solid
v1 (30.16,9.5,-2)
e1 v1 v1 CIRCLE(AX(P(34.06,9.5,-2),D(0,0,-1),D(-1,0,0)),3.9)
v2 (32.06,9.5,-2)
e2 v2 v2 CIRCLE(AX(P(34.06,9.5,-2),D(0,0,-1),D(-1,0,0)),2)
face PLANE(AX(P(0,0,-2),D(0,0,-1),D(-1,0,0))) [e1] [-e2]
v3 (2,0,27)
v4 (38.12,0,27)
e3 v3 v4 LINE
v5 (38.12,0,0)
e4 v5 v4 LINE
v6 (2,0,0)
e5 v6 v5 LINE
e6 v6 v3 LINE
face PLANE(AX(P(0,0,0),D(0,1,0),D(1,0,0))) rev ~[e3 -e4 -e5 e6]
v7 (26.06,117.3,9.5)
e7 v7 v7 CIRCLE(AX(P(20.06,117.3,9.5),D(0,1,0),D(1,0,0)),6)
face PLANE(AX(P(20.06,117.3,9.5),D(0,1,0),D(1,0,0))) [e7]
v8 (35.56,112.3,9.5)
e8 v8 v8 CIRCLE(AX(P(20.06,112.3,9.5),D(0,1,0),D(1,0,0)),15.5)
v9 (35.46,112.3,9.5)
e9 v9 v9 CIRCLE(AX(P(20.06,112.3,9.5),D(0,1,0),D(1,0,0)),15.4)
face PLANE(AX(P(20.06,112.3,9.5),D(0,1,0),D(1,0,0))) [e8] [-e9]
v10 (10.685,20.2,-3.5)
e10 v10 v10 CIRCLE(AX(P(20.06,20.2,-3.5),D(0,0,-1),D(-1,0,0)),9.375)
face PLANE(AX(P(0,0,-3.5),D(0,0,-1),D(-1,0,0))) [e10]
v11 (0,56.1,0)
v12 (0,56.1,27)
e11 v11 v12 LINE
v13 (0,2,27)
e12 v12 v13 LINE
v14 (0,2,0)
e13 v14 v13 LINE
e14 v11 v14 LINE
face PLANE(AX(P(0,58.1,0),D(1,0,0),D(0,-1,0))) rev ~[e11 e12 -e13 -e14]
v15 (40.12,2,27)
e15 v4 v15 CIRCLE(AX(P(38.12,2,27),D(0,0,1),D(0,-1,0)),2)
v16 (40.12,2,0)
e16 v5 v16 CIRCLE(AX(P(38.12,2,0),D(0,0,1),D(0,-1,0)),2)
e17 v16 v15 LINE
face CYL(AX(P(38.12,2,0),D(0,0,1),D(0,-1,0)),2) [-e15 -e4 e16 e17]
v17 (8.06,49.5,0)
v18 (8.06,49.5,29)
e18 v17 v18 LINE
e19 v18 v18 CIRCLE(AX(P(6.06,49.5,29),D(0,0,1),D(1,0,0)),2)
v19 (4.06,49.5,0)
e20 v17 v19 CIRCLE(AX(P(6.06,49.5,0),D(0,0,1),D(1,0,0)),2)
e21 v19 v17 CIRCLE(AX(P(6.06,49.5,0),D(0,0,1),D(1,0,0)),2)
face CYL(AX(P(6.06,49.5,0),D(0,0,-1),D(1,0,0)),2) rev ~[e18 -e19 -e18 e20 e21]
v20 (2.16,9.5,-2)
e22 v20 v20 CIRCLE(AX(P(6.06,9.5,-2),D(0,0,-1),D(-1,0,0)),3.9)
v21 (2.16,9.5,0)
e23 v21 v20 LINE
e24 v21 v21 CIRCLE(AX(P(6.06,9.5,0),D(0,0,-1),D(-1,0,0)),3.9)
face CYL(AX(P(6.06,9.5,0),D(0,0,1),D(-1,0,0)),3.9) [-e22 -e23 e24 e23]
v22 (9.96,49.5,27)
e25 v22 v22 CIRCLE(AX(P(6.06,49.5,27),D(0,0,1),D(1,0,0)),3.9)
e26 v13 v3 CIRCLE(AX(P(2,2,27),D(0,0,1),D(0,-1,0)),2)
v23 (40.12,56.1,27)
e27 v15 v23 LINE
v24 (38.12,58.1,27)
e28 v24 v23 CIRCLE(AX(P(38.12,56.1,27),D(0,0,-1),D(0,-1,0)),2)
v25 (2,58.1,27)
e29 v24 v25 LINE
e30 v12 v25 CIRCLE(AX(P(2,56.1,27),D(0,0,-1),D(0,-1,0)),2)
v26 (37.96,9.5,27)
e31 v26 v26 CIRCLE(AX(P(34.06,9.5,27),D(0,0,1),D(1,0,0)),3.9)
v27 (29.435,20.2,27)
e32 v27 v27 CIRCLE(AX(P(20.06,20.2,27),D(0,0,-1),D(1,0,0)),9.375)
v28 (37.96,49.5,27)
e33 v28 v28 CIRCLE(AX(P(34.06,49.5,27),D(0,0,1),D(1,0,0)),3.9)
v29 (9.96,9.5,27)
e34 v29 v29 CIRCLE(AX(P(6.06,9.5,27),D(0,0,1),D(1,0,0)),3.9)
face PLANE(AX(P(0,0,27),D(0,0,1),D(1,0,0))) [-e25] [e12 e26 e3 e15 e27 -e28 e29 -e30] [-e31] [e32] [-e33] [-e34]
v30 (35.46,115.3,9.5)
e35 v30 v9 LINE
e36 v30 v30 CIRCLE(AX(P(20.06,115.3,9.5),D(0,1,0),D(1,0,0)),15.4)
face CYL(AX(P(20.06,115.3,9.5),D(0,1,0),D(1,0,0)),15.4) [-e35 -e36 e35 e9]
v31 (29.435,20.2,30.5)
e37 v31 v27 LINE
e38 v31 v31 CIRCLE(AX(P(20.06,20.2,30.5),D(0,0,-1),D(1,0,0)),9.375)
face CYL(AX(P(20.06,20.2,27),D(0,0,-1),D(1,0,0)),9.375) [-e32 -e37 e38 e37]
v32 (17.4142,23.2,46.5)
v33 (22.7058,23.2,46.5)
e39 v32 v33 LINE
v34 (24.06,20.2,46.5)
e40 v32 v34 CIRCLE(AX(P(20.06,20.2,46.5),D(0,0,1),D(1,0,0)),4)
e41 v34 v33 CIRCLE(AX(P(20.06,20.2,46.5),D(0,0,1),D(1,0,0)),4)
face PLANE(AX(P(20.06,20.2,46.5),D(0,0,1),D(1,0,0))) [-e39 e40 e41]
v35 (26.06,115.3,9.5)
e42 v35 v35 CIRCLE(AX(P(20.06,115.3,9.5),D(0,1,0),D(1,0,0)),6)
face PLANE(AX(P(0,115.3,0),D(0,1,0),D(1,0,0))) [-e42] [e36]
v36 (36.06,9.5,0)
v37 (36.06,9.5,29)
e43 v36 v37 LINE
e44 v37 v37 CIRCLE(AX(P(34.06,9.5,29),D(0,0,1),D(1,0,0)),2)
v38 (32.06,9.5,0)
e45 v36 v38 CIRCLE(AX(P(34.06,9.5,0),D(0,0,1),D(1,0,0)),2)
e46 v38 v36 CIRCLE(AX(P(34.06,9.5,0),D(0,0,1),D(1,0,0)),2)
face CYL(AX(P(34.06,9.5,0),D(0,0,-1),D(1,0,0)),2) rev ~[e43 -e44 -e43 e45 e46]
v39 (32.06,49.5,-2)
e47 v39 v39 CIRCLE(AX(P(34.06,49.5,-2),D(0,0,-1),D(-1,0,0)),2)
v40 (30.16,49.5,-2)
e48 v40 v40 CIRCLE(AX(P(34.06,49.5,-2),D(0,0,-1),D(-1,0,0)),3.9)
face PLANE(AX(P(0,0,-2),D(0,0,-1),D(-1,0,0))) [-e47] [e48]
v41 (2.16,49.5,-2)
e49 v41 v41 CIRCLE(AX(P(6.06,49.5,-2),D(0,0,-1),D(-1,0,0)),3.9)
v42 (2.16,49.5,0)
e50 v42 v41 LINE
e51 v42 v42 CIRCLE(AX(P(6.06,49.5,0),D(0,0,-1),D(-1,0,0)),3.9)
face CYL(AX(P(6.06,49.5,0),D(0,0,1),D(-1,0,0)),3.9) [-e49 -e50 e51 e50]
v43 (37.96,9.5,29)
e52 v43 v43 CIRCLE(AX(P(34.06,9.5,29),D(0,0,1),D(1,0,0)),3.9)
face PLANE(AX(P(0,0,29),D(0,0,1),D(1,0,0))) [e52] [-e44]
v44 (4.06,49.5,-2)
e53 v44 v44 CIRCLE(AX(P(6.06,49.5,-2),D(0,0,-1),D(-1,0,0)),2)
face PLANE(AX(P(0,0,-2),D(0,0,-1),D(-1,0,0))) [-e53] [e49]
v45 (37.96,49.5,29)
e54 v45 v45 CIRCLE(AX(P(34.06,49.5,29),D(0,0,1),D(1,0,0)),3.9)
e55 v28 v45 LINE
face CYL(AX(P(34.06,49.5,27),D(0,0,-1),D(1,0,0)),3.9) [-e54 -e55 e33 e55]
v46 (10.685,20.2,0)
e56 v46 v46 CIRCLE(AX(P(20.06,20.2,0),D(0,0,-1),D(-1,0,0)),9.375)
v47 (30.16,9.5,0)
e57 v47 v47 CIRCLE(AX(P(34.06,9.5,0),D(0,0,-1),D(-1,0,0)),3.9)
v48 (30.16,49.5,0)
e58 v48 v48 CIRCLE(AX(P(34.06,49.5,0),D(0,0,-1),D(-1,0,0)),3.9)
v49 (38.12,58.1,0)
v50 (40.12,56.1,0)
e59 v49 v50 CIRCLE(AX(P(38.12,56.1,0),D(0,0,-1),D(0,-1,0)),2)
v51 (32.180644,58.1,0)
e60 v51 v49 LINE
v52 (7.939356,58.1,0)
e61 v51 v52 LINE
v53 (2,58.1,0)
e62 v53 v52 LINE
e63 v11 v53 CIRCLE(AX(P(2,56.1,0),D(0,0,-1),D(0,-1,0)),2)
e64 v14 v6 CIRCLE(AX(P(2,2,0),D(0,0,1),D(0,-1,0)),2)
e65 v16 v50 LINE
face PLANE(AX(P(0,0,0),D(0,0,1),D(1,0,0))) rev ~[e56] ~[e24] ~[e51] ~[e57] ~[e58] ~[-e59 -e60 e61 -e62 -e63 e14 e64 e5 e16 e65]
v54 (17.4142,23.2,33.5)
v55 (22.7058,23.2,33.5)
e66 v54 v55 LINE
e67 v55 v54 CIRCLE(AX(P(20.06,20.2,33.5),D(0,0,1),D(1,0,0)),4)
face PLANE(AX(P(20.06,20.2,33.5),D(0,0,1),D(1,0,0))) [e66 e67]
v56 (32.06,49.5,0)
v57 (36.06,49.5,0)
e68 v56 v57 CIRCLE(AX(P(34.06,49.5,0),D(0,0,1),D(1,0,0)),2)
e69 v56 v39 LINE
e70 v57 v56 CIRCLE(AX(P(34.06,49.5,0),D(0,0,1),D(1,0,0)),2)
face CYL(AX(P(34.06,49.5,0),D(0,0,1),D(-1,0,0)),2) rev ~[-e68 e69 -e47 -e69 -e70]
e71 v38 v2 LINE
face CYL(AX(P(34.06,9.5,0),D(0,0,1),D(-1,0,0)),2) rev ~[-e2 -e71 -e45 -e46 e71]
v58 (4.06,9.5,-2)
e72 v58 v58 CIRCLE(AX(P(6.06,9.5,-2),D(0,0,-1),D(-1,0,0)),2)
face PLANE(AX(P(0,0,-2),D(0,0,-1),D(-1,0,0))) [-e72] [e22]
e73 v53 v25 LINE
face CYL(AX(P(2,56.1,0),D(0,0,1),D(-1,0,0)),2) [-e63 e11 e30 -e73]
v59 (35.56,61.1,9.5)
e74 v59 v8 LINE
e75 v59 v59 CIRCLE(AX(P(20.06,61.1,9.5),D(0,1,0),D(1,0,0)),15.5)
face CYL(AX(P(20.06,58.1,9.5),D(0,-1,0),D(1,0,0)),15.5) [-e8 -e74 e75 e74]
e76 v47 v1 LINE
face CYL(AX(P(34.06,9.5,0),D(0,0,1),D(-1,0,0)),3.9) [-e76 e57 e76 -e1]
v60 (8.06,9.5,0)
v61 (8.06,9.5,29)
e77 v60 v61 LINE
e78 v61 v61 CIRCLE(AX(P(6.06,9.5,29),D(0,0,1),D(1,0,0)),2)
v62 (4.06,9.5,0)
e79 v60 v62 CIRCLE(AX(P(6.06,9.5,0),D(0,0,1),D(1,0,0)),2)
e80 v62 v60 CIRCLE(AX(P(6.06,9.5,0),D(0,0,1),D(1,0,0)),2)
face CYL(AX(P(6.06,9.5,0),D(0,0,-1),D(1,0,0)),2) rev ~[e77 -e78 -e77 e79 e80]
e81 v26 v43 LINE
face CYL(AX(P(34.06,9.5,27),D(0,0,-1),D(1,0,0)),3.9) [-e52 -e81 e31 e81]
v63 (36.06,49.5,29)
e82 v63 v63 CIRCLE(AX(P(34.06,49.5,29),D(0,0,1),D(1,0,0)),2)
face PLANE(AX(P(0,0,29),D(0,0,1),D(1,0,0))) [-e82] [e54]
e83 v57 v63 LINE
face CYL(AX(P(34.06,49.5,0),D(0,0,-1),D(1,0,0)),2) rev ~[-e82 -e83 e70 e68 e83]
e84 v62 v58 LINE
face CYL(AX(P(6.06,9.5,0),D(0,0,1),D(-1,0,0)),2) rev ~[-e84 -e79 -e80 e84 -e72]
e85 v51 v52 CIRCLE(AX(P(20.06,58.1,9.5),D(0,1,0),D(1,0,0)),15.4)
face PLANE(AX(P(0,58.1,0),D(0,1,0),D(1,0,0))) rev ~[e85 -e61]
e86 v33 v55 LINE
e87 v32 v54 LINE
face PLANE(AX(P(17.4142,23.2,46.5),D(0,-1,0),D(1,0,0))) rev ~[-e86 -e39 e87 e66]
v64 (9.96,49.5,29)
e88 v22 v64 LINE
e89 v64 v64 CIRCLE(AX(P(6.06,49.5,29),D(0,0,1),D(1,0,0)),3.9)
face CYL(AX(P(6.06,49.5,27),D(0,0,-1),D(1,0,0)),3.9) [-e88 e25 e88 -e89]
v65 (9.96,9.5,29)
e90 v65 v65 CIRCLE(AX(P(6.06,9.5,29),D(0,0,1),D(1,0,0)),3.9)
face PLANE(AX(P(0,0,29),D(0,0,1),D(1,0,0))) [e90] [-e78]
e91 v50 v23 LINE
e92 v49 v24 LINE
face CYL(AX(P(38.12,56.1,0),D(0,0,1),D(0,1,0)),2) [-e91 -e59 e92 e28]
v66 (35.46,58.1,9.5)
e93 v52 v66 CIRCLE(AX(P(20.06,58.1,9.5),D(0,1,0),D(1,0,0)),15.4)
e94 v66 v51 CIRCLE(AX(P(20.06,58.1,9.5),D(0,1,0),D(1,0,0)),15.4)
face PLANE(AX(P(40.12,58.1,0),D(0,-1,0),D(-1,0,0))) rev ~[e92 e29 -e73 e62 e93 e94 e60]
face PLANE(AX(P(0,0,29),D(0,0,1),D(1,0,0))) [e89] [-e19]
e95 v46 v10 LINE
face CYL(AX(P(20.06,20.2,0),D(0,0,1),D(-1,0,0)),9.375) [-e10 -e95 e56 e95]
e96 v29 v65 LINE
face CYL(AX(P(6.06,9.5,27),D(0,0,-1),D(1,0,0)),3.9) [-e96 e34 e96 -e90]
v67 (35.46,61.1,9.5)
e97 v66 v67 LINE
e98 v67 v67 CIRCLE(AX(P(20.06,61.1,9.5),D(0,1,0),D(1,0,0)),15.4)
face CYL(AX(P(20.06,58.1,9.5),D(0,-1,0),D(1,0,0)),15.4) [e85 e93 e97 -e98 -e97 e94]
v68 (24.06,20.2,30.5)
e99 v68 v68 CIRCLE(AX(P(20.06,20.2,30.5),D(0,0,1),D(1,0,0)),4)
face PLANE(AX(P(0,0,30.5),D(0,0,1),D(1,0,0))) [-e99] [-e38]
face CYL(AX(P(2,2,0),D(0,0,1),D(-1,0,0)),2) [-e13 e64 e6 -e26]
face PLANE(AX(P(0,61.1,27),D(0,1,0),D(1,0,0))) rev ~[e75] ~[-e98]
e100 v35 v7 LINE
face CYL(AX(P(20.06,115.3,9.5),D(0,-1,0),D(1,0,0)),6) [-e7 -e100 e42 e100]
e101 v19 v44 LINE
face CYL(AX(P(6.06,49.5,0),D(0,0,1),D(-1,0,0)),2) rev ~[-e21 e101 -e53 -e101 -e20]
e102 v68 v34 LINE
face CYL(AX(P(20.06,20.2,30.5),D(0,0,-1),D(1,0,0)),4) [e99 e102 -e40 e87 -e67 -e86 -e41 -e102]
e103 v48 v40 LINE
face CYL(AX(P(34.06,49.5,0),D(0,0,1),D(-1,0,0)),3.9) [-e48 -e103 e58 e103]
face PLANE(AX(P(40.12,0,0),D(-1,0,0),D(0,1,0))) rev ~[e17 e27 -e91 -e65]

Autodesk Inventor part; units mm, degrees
ref_plane "YZ Plane" through (0, 0, 0) normal (1, 0, 0) x (0, 1, 0)
ref_plane "XZ Plane" through (0, 0, 0) normal (0, 1, 0) x (-1, 0, 0)
ref_plane "XY Plane" through (0, 0, 0) normal (0, 0, 1) x (1, 0, 0)
sketch "Sketch1" plane through (0, 0, 0) normal (0, 0, 1) x (1, 0, 0)
  line L0 (0, 0) -> (40.12, 0)
  line L1 (40.12, 0) -> (40.12, 58.1)
  line L2 (40.12, 58.1) -> (0, 58.1)
  line L3 (0, 58.1) -> (0, 0)
  circle A0 centre (20.06, 20.2) radius 4
  line L4 (6.06, 49.5) -> (34.06, 49.5) construction
  line L5 (34.06, 49.5) -> (34.06, 9.5) construction
  line L6 (34.06, 9.5) -> (6.06, 9.5) construction
  line L7 (6.06, 9.5) -> (6.06, 49.5) construction
  circle A1 centre (6.06, 49.5) radius 2
  circle A2 centre (34.06, 49.5) radius 2
  circle A3 centre (34.06, 9.5) radius 2
  circle A4 centre (6.06, 9.5) radius 2
  point P0 (20.06, 58.1)
  point P1 (20.06, 49.5)
  dimension "d0" = 40.12
  dimension "d1" = 58.1
  dimension "d2" = 8
  dimension "d3" = 37.9
  dimension "d4" = 28
  dimension "d5" = 40
  dimension "d6" = 8.6
  dimension "d7" = 4
  dimension "d8" = 4
  dimension "d9" = 4
  dimension "d10" = 4
extrude "Extrusion1" add sketch "Sketch1" along normal blind 27
sketch "Sketch2" plane through (0, 0, 27) normal (0, 0, 1) x (1, 0, 0)
  circle A0 centre (6.06, 49.5) radius 2 projected
  circle A1 centre (34.06, 49.5) radius 2 projected
  circle A2 centre (20.06, 20.2) radius 4 projected
  circle A3 centre (34.06, 9.5) radius 2 projected
  circle A4 centre (6.06, 9.5) radius 2 projected
  circle A5 centre (6.06, 49.5) radius 2 projected
  circle A6 centre (6.06, 49.5) radius 3.9
  circle A7 centre (34.06, 9.5) radius 2 projected
  circle A8 centre (34.06, 9.5) radius 3.9
  circle A9 centre (34.06, 49.5) radius 2 projected
  circle A10 centre (34.06, 49.5) radius 3.9
  circle A11 centre (6.06, 9.5) radius 3.9
  circle A12 centre (20.06, 20.2) radius 9.375
  point P0 (0, 0)
  dimension "d13" = 7.8
  dimension "d14" = 7.8
  dimension "d15" = 7.8
  dimension "d16" = 7.8
  dimension "d17" = 18.75
extrude "Extrusion2" add sketch "Sketch2" along normal blind 2
sketch "Sketch3" plane through (0, 0, 27) normal (0, 0, 1) x (1, 0, 0)
  circle A0 centre (20.06, 20.2) radius 9.375 projected
  circle A1 centre (20.06, 20.2) radius 4 projected
  point P0 (0, 0)
extrude "Extrusion3" add sketch "Sketch3" along normal blind 3.5
sketch "Sketch4" plane through (0, 0, 0) normal (0, 0, -1) x (-1, 0, 0)
  circle A0 centre (-20.06, 20.2) radius 9.375 projected
  circle A1 centre (-20.06, 20.2) radius 4 projected
  point P0 (0, 0)
extrude "Extrusion4" add sketch "Sketch4" along normal blind 3.5
sketch "Sketch5" plane through (20.06, 20.2, -3.5) normal (0, 0, -1) x (-1, 0, 0)
  circle A0 centre (0, 0) radius 9.375 projected
  point P0 (20.06, -20.2)
extrude "Extrusion5" add sketch "Sketch5" against normal up to surface (34 mm away) from surface at 0
sketch "Sketch6" plane through (20.06, 20.2, 30.5) normal (0, 0, 1) x (1, 0, 0)
  circle A0 centre (0, 0) radius 4
  circle A1 centre (0, 0) radius 9.375 projected
  point P0 (-20.06, -20.2)
  dimension "d26" = 8
extrude "Extrusion6" add sketch "Sketch6" along normal blind 16 contours A0
sketch "Sketch7" plane through (20.06, 20.2, 46.5) normal (0, 0, 1) x (1, 0, 0)
  line L0 (-2.6458, 3) -> (2.6458, 3)
  circle A0 centre (0, 0) radius 4 projected
  arc A1 (-2.6458, 3) -> (2.6458, 3) centre (0, 0) ccw
  point P0 (-20.06, -20.2)
  point P1 (0, 3)
  dimension "d29" = 7
extrude "Extrusion7" cut sketch "Sketch7" against normal blind 13 contours A0 L0 picked at (0.5822, 3.4764)
sketch "Sketch8" plane through (0, 58.1, 0) normal (0, 1, 0) x (1, 0, 0)
  circle A0 centre (20.06, -9.5) radius 15.5
  line L0 (40.12, -27) -> (0, -27) projected
  line L1 (40.12, 0) -> (40.12, -27) projected
  line L2 (40.12, -13.5) -> (0, -13.5)
  point P0 (0, 0)
  point P1 (20.06, -27)
  point P2 (20.06, -13.5)
  dimension "d32" = 31
  dimension "d34" = 4
extrude "Extrusion8" add sketch "Sketch8" along normal blind 57.2
sketch "Sketch10" plane through (20.06, 115.3, 9.5) normal (0, 1, 0) x (1, 0, 0)
  circle A0 centre (0, 0) radius 6
  circle A1 centre (0, 0) radius 15.5 projected
  point P0 (-20.06, 9.5)
  dimension "d37" = 12
extrude "Extrusion9" add sketch "Sketch10" along normal blind 2 contours A0
sketch "Sketch11" plane through (20.06, 115.3, 9.5) normal (0, 1, 0) x (1, 0, 0)
  circle A0 centre (0, 0) radius 15.5 projected
  circle A1 centre (0, 0) radius 15.4
  point P0 (-20.06, 9.5)
  dimension "d40" = 0.1
extrude "Extrusion10" cut sketch "Sketch11" against normal blind 3
sketch "Sketch12" plane through (0, 58.1, 27) normal (0, 1, 0) x (1, 0, 0)
  circle A0 centre (20.06, 17.5) radius 15.4 projected
  circle A1 centre (20.06, 17.5) radius 15.5 projected
  point P0 (0, 27)
extrude "Extrusion11" cut sketch "Sketch12" along normal blind 3
sketch "Sketch13" plane through (0, 0, 0) normal (0, 0, -1) x (-1, 0, 0)
  circle A0 centre (-6.06, 49.5) radius 3.9 projected
  circle A1 centre (-34.06, 49.5) radius 3.9 projected
  circle A2 centre (-34.06, 9.5) radius 3.9 projected
  circle A3 centre (-6.06, 9.5) radius 3.9 projected
  circle A4 centre (-6.06, 9.5) radius 2 projected
  circle A5 centre (-6.06, 49.5) radius 2 projected
  circle A6 centre (-34.06, 49.5) radius 2 projected
  circle A7 centre (-34.06, 9.5) radius 2 projected
  point P0 (0, 0)
extrude "Extrusion12" add sketch "Sketch13" along normal blind 2
fillet "Fillet1" radius 2 4 edges at (40.12, 58.1, 13.5) (0, 58.1, 13.5) (0, 0, 13.5) (40.12, 0, 13.5)
properties part number "TS-40GZ495" material "Stainless Steel"
